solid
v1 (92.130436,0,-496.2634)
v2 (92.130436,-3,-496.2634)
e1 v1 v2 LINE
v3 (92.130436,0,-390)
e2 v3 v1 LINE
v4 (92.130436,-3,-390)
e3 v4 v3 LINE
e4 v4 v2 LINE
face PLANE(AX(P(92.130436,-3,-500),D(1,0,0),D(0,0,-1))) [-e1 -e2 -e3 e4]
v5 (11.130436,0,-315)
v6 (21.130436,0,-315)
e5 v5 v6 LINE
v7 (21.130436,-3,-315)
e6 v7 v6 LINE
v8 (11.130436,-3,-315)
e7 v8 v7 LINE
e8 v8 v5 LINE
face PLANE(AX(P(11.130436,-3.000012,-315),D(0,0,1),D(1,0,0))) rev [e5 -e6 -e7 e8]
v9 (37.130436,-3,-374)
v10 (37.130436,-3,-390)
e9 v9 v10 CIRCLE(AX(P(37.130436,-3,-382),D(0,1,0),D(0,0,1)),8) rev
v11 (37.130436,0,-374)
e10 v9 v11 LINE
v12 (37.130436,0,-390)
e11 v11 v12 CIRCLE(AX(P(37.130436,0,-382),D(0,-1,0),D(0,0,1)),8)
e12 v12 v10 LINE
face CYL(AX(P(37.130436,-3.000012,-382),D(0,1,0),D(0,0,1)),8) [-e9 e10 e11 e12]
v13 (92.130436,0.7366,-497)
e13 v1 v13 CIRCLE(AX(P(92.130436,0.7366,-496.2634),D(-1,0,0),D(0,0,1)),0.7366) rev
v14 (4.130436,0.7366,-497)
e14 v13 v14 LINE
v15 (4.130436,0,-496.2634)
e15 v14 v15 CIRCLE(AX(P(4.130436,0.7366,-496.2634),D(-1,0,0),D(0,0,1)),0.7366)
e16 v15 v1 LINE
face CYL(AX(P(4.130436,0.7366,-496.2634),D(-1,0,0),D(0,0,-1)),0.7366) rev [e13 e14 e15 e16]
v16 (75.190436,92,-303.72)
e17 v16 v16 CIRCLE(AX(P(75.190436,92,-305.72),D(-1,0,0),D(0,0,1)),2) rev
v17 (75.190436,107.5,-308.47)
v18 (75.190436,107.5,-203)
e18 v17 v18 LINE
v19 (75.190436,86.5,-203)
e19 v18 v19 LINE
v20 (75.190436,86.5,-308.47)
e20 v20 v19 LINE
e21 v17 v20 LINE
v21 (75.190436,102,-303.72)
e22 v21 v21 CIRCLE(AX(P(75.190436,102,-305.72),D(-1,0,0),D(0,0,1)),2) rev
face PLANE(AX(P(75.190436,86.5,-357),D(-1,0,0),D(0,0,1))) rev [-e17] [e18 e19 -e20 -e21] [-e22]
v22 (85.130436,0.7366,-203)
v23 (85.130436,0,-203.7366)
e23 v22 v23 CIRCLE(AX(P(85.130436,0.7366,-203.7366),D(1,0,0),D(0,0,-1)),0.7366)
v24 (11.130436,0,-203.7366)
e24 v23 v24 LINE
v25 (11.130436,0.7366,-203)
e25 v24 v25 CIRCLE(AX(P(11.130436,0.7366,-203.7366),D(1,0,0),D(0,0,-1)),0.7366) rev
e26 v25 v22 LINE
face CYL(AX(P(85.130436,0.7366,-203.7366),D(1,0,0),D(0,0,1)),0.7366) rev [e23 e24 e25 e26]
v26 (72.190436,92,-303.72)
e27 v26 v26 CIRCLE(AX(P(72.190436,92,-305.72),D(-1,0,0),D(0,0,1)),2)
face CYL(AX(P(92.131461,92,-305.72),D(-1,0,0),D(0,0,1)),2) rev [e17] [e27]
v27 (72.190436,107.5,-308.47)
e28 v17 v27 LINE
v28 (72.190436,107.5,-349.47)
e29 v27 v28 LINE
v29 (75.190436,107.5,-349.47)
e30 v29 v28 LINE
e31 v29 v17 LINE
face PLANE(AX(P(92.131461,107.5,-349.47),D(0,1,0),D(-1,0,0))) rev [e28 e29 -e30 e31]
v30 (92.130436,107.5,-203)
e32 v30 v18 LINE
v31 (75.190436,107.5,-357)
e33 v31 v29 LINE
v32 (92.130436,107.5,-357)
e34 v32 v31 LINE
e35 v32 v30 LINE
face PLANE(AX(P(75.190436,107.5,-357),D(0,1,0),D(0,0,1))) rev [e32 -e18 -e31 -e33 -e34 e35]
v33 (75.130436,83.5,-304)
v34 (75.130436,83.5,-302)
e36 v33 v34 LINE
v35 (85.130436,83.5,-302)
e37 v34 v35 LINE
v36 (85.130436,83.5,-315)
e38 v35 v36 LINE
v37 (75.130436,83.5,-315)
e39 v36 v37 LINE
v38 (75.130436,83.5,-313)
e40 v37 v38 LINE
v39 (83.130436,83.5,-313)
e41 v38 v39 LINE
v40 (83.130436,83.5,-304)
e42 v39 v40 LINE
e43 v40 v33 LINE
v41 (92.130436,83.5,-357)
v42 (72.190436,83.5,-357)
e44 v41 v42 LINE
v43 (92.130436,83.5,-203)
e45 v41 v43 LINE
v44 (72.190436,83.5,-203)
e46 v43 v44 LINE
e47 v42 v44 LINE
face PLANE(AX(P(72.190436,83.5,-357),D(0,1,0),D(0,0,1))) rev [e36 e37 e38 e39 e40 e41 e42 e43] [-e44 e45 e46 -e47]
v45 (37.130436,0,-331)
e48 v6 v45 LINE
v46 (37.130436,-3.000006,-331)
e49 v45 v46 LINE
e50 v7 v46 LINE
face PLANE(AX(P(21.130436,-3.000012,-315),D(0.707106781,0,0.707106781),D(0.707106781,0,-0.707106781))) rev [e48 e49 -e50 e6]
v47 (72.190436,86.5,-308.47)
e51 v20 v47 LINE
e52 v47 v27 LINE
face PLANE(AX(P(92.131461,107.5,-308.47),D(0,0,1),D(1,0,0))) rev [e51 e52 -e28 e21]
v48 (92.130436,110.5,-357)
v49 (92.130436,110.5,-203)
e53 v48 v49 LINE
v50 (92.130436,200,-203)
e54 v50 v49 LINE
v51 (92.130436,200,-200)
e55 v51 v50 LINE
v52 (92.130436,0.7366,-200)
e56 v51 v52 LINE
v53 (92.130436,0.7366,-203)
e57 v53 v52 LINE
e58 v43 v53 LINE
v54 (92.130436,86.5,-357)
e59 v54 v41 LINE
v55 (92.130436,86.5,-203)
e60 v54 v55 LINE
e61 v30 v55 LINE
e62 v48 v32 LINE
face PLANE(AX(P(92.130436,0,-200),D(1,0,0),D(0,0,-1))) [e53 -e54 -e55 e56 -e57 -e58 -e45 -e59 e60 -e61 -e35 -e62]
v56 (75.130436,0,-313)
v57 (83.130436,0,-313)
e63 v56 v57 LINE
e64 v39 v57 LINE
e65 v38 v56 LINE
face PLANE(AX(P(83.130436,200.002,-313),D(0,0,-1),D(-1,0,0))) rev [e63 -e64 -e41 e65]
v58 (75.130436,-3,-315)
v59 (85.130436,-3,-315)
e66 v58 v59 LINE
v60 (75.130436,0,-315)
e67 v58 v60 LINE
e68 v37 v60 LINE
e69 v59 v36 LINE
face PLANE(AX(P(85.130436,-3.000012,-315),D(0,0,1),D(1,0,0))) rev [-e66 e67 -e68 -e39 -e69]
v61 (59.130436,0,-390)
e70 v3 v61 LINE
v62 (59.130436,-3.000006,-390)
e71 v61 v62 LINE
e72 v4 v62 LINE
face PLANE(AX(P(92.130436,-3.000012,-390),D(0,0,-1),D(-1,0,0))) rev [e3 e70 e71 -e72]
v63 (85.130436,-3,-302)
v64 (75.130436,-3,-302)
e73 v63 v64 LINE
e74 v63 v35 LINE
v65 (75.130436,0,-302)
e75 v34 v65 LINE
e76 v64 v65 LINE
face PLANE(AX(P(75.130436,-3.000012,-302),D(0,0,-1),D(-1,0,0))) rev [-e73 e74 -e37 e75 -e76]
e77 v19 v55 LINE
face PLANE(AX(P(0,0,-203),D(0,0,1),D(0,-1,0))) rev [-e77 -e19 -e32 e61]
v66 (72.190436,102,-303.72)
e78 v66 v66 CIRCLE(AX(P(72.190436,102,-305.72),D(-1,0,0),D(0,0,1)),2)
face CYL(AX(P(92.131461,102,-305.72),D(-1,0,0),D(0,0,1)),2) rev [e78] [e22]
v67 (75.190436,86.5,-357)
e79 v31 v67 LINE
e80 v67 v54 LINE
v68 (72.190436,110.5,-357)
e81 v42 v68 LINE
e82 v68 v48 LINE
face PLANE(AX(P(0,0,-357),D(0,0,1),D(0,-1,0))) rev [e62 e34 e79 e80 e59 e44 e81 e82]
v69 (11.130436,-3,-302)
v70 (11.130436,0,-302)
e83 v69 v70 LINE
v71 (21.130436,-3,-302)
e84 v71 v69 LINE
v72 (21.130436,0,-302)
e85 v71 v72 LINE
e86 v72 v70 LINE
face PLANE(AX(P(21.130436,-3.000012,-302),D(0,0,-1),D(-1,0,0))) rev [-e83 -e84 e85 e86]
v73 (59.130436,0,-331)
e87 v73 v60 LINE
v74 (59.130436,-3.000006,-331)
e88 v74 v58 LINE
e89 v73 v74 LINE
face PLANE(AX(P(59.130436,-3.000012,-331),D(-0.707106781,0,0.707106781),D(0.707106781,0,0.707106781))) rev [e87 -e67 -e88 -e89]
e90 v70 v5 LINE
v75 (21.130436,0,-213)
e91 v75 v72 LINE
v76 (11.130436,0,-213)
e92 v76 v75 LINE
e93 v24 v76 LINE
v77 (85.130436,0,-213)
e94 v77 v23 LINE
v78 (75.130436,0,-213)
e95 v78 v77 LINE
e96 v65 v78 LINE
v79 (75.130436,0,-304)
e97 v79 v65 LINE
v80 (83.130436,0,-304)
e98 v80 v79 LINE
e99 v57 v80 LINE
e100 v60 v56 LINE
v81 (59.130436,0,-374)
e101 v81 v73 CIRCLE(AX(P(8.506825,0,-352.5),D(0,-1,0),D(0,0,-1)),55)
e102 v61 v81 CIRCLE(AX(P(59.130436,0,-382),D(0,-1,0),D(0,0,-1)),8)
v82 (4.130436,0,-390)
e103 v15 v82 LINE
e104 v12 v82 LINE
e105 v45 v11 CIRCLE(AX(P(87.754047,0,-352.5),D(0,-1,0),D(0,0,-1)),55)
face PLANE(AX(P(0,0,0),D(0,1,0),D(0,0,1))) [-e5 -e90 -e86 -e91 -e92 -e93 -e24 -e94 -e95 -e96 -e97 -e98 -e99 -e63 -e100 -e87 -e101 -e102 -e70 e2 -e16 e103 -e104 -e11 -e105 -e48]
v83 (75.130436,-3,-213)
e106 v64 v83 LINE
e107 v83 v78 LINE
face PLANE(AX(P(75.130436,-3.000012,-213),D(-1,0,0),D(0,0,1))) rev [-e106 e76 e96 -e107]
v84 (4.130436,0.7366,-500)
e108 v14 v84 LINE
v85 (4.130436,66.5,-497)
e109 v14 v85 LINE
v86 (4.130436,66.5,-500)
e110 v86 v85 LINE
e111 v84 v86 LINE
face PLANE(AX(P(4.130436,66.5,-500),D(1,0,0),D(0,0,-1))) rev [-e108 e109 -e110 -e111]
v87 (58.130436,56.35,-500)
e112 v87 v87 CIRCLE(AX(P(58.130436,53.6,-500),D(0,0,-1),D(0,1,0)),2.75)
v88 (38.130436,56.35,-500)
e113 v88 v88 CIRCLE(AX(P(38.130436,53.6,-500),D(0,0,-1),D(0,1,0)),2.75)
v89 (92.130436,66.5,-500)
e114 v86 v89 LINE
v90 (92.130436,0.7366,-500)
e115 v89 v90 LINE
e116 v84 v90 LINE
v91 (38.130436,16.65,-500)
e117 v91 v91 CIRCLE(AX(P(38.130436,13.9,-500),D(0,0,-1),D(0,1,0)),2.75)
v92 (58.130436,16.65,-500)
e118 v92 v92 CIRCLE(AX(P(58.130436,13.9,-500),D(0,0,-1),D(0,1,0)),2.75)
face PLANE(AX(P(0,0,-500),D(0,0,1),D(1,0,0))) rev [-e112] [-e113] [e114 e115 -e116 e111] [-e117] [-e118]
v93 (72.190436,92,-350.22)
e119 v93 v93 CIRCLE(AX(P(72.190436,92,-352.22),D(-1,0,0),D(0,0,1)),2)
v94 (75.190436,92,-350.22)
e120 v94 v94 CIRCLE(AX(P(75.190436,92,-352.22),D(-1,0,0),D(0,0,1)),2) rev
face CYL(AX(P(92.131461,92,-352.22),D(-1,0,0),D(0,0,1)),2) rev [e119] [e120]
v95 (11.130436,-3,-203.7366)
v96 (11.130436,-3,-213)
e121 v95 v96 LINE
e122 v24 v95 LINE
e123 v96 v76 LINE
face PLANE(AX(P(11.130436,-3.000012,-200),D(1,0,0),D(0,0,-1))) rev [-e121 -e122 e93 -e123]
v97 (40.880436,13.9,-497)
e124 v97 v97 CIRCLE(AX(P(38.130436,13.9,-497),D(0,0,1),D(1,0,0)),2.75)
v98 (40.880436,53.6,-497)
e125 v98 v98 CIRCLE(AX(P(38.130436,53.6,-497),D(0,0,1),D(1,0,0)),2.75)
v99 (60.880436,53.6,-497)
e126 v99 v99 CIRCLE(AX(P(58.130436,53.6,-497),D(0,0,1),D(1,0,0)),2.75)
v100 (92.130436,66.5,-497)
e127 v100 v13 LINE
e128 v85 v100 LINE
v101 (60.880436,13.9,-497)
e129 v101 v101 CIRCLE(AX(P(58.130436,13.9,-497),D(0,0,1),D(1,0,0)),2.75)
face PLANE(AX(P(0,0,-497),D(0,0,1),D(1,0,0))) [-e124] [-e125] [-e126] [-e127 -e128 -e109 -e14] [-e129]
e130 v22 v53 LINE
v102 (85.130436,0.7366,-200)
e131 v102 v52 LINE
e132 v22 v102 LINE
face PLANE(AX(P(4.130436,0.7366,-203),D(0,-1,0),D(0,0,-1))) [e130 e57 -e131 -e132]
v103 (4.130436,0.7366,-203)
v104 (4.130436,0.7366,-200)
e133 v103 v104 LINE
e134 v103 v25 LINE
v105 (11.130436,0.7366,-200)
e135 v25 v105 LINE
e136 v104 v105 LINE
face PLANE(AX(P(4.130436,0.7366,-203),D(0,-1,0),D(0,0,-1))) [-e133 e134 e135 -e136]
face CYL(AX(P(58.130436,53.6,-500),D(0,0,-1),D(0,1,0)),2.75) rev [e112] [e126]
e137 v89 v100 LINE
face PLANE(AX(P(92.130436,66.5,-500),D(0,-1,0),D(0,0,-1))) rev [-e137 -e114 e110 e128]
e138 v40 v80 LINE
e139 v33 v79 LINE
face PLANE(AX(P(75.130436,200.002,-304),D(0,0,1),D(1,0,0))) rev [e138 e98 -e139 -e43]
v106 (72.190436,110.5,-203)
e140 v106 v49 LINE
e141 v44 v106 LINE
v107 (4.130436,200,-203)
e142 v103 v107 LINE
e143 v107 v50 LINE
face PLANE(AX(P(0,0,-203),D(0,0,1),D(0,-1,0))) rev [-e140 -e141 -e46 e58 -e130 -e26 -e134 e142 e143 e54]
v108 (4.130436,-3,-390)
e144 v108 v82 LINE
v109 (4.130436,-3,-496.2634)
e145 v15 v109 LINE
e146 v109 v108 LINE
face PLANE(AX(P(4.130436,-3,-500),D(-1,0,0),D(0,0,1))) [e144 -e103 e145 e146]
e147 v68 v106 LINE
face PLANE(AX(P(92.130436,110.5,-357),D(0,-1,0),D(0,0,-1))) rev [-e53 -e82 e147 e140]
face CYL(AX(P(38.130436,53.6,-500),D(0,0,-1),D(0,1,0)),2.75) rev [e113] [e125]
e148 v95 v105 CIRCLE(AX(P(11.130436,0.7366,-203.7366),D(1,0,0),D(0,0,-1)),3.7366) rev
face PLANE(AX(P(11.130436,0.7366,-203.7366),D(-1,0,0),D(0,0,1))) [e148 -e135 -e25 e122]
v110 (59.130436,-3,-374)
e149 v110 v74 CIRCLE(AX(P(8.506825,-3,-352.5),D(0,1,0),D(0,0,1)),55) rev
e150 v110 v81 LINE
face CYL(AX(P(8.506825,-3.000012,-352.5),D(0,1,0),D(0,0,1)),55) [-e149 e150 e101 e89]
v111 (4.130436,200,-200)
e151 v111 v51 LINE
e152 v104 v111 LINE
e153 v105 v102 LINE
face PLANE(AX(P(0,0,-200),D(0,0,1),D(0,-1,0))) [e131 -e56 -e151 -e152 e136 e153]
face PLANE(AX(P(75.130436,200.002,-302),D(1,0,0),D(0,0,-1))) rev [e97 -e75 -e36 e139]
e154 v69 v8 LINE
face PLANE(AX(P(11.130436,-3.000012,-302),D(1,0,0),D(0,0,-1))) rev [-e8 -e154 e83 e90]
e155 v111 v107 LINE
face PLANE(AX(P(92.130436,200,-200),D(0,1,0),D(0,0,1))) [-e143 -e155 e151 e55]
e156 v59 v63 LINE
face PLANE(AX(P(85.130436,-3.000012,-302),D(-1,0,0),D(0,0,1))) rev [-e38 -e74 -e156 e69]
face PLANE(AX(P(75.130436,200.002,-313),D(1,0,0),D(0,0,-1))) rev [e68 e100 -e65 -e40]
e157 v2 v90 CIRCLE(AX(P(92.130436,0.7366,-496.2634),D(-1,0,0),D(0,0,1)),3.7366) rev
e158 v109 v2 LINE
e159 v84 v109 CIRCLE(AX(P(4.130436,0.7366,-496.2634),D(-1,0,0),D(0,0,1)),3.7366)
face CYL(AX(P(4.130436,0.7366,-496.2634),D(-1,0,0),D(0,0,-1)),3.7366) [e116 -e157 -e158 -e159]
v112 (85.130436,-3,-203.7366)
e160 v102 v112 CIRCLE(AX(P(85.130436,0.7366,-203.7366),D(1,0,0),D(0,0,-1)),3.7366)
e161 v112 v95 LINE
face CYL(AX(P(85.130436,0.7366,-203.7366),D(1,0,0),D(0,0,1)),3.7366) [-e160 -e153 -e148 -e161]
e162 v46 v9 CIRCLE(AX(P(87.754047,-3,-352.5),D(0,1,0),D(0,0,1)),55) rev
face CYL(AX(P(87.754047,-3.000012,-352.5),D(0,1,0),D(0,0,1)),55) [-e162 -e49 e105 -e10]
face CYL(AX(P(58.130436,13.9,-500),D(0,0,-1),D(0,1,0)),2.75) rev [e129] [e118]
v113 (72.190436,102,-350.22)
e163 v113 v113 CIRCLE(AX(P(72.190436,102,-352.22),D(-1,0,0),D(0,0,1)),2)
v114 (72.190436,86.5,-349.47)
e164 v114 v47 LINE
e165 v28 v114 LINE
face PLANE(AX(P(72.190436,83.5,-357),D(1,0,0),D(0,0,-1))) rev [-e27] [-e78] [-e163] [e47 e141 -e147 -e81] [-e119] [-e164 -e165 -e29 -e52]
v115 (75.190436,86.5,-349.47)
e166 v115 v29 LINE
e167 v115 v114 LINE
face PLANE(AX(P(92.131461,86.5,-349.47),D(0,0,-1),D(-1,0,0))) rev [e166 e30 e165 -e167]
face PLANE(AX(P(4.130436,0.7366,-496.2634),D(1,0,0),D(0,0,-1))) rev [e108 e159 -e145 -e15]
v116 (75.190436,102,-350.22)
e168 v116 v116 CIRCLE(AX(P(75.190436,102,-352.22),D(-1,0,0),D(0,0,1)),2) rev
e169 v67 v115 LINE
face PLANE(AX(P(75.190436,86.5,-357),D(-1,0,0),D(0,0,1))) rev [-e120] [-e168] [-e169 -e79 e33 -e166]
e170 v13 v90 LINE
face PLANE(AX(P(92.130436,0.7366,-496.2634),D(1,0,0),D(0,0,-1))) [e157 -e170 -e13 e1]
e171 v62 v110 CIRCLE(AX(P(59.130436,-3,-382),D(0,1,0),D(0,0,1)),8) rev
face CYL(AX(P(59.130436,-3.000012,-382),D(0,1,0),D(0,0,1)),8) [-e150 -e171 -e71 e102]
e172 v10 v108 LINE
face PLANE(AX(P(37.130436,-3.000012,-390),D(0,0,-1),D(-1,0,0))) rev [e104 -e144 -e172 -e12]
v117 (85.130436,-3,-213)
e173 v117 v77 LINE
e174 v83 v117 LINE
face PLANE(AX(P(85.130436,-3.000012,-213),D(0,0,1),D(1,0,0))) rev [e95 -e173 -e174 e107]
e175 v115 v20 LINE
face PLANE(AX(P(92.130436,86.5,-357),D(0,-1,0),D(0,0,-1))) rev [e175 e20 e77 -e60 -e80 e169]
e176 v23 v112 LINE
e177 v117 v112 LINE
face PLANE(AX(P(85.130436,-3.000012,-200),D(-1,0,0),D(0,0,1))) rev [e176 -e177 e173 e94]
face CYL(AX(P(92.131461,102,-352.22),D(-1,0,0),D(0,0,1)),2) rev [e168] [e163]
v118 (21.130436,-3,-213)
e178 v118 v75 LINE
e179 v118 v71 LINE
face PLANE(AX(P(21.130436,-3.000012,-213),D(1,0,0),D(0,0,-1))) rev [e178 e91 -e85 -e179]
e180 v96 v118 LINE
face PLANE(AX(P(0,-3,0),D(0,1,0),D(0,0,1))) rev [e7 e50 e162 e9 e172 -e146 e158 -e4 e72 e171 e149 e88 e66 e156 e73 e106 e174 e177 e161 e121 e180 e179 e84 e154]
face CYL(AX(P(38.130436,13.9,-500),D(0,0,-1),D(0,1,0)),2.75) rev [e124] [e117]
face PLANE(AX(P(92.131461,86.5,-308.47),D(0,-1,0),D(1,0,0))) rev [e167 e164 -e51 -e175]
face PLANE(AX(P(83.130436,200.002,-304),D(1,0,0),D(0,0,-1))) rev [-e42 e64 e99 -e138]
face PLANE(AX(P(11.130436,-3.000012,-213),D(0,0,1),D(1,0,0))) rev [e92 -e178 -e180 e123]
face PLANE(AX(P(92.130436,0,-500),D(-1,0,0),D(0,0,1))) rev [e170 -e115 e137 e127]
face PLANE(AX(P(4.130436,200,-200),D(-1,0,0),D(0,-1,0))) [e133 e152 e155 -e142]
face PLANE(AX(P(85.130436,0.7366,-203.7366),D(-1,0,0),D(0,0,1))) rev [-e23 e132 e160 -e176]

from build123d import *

# Parameters (mm, degrees)
BASE_FLANGE1_START                    = -3
BASE_FLANGE1_OUTLINE_W                = 88
BASE_FLANGE1_OUTLINE_H                = 300
BASE_FLANGE1_DEPTH                    = 3
CUT_EXTRUDE2_DEPTH                    = 509.426019398
CUT_EXTRUDE2_DEPTH_BACK               = 3
SKETCH14_OUTSIDE_W                    = 152.53
SKETCH14_OUTSIDE_H                    = 364.53
T_LE_PLI_E_SUR_AR_TE2_STRIP_W         = 13.4732
T_LE_PLI_E_SUR_AR_TE2_STRIP_H         = 3
T_LE_PLI_E_SUR_AR_TE2_STRIP_CUT_DEPTH = 88
T_LE_PLI_E_SUR_AR_TE2_DEPTH           = 88
D_GAGEMENT_M51_D                      = 5.5
T_LE_PLI_E_SUR_AR_TE3_STRIP_W         = 13.4732
T_LE_PLI_E_SUR_AR_TE3_STRIP_H         = 3
T_LE_PLI_E_SUR_AR_TE3_STRIP_CUT_DEPTH = 74
T_LE_PLI_E_SUR_AR_TE3_DEPTH           = 74
T_LE_PLI_E_SUR_AR_TE3_PROFILE_W       = 88
T_LE_PLI_E_SUR_AR_TE3_PROFILE_H       = 199.2634
T_LE_PLI_E_SUR_AR_TE3_FLAT_DEPTH      = 3
BOSS_EXTRUDE2_DEPTH                   = 154
CUT_EXTRUDE3_REACH                    = 544.8
SKETCH48_W                            = 41
SKETCH48_H                            = 21
BOSS_EXTRUDE3_REACH                   = 548.341
CUT_EXTRUDE4_REACH                    = 544.8
SKETCH50_R                            = 2


# Read off the part's stored shape, not the designer's step: Base-Flange1
# Sheet-metal steps are written as plain solids
with BuildPart() as part:
    # Base-Flange1 outline → Base-Flange1 (new body)
    with BuildSketch(Plane(origin=(0, 0, 0), x_dir=(1, 0, 0), z_dir=(0, 1, 0)).offset(BASE_FLANGE1_START)):
        with Locations((48.130435799, 350)):
            Rectangle(BASE_FLANGE1_OUTLINE_W, BASE_FLANGE1_OUTLINE_H)
    extrude(amount=BASE_FLANGE1_DEPTH)

    # Sketch14 outside → Cut-Extrude2 (cut, two sides: drawn at the far end of the back side and taken through both)
    with BuildSketch(Plane.XZ.offset(3).offset(-CUT_EXTRUDE2_DEPTH_BACK)):
        with Locations((48.13, -350)):
            Rectangle(SKETCH14_OUTSIDE_W, SKETCH14_OUTSIDE_H)
        with BuildLine():
            Line((85.130435799, -200), (11.130435799, -200))
            Line((11.130435799, -200), (11.130435799, -213))
            Line((11.130435799, -213), (21.130435799, -213))
            Line((21.130435799, -213), (21.130435799, -302))
            Line((21.130435799, -302), (11.130435799, -302))
            Line((11.130435799, -302), (11.130435799, -315))
            Line((11.130435799, -315), (21.130435799, -315))
            Line((21.130435799, -315), (37.130435799, -331))
            ThreePointArc((37.130435799, -331), (32.754046891, -352.5), (37.130435799, -374))
            ThreePointArc((37.130435799, -374), (29.130435799, -382), (37.130435799, -390))
            Line((37.130435799, -390), (4.130435799, -390))
            Line((4.130435799, -390), (4.130435799, -500))
            Line((4.130435799, -500), (92.130435799, -500))
            Line((92.130435799, -500), (92.130435799, -390))
            Line((92.130435799, -390), (59.130435799, -390))
            ThreePointArc((59.130435799, -390), (67.130435799, -382), (59.130435799, -374))
            ThreePointArc((59.130435799, -374), (63.506824707, -352.5), (59.130435799, -331))
            Line((59.130435799, -331), (75.130435799, -315))
            Line((75.130435799, -315), (85.130435799, -315))
            Line((85.130435799, -315), (85.130435799, -302))
            Line((85.130435799, -302), (75.130435799, -302))
            Line((75.130435799, -302), (75.130435799, -213))
            Line((75.130435799, -213), (85.130435799, -213))
            Line((85.130435799, -213), (85.130435799, -200))
        make_face(mode=Mode.SUBTRACT)
    extrude(amount=CUT_EXTRUDE2_DEPTH + CUT_EXTRUDE2_DEPTH_BACK, mode=Mode.SUBTRACT)

    # Tôle pliée sur arête2 strip (across the edge) → Tôle pliée sur arête2 strip cut (cut)
    with BuildSketch(Plane(origin=(92.130435799, 0, -500), x_dir=(0, 0, 1), z_dir=(-1, 0, 0))):
        with Locations((-3, -1.5)):
            Rectangle(T_LE_PLI_E_SUR_AR_TE2_STRIP_W, T_LE_PLI_E_SUR_AR_TE2_STRIP_H)
    extrude(amount=T_LE_PLI_E_SUR_AR_TE2_STRIP_CUT_DEPTH, mode=Mode.SUBTRACT)

    # Tôle pliée sur arête2 section (across the edge) → Tôle pliée sur arête2 (add)
    with BuildSketch(Plane(origin=(92.130435799, 0, -500), x_dir=(0, 0, 1), z_dir=(-1, 0, 0))):
        with BuildLine():
            Line((0, 0.7366), (0, 66.5))
            Line((0, 66.5), (3, 66.5))
            Line((3, 66.5), (3, 0.7366))
            ThreePointArc((3, 0.7366), (3.215745145, 0.215745145), (3.7366, 0))
            Line((3.7366, 0), (3.7366, -3))
            ThreePointArc((3.7366, -3), (1.094424801, -1.905575199), (0, 0.7366))
        make_face()
    extrude(amount=T_LE_PLI_E_SUR_AR_TE2_DEPTH)

    # Dégagement M51 (through all)
    with Locations(Plane(origin=(58.130435799, 53.6, -500), x_dir=(-1, 0, 0), z_dir=(0, 0, -1))):
        with Locations((0, 0), (20, 0), (0, -39.7), (20, -39.7)):
            Hole(D_GAGEMENT_M51_D / 2)

    # Tôle pliée sur arête3 strip (across the edge) → Tôle pliée sur arête3 strip cut (cut)
    with BuildSketch(Plane(origin=(11.130435799, 0, -200), x_dir=(0, 0, -1), z_dir=(1, 0, 0))):
        with Locations((-3, -1.5)):
            Rectangle(T_LE_PLI_E_SUR_AR_TE3_STRIP_W, T_LE_PLI_E_SUR_AR_TE3_STRIP_H)
    extrude(amount=T_LE_PLI_E_SUR_AR_TE3_STRIP_CUT_DEPTH, mode=Mode.SUBTRACT)

    # Tôle pliée sur arête3 bend section (across the edge) → Tôle pliée sur arête3 (add)
    with BuildSketch(Plane(origin=(11.130435799, 0, -200), x_dir=(0, 0, -1), z_dir=(1, 0, 0))):
        with BuildLine():
            Line((0, 0.7366), (3, 0.7366))
            ThreePointArc((3, 0.7366), (3.215745145, 0.215745145), (3.7366, 0))
            Line((3.7366, 0), (3.7366, -3))
            ThreePointArc((3.7366, -3), (1.094424801, -1.905575199), (0, 0.7366))
        make_face()
    extrude(amount=T_LE_PLI_E_SUR_AR_TE3_DEPTH)

    # Tôle pliée sur arête3 profile (on flange) → Tôle pliée sur arête3 flat (add)
    with BuildSketch(Plane(origin=(0, 0, -200), x_dir=(-1, 0, 0), z_dir=(0, 0, -1))):
        with Locations((-48.130435799, 100.3683)):
            Rectangle(T_LE_PLI_E_SUR_AR_TE3_PROFILE_W, T_LE_PLI_E_SUR_AR_TE3_PROFILE_H)
    extrude(amount=T_LE_PLI_E_SUR_AR_TE3_FLAT_DEPTH)

    # Sketch47 → Boss-Extrude2 (add)
    with BuildSketch(Plane(origin=(0, 0, -203), x_dir=(-1, 0, 0), z_dir=(0, 0, -1))):
        Polygon((-72.190435799, 83.5), (-72.190435799, 110.5), (-92.130435799, 110.5), (-92.130435799, 107.5), (-75.190435799, 107.5), (-75.190435799, 86.5), (-92.130435799, 86.5), (-92.130435799, 83.5), align=None)
    extrude(amount=BOSS_EXTRUDE2_DEPTH)

    # Sketch48 → Cut-Extrude3 (cut, up to next)
    with BuildSketch(Plane.ZY.offset(-72.190435799), mode=Mode.PRIVATE) as cut_extrude3_sk1:
        with Locations((-328.97, 97)):
            Rectangle(SKETCH48_W, SKETCH48_H)
    cut_extrude3_tool1 = extrude(cut_extrude3_sk1.sketch, amount=-CUT_EXTRUDE3_REACH, mode=Mode.PRIVATE) & part.part
    add(cut_extrude3_tool1.solids().sort_by_distance((72.190436, 97, -328.97))[0], mode=Mode.SUBTRACT)

    # Sketch49 → Boss-Extrude3 (add, up to next)
    with BuildSketch(Plane(origin=(0, 0, 0), x_dir=(1, 0, 0), z_dir=(0, 1, 0)), mode=Mode.PRIVATE) as boss_extrude3_sk1:
        Polygon((75.130435799, 315), (85.130435799, 315), (85.130435799, 302), (75.130435799, 302), (75.130435799, 304), (83.130435799, 304), (83.130435799, 313), (75.130435799, 313), align=None)
    boss_extrude3_tool1 = extrude(boss_extrude3_sk1.sketch, amount=BOSS_EXTRUDE3_REACH, mode=Mode.PRIVATE) - part.part
    add(boss_extrude3_tool1.solids().sort_by_distance((80.130436, 0, -314.835988))[0])

    # Sketch50 → Cut-Extrude4 (cut, up to next)
    with BuildSketch(Plane.ZY.offset(-72.190435799), mode=Mode.PRIVATE) as cut_extrude4_sk1:
        with Locations((-352.22, 102)):
            Circle(SKETCH50_R)
    cut_extrude4_tool1 = extrude(cut_extrude4_sk1.sketch, amount=-CUT_EXTRUDE4_REACH, mode=Mode.PRIVATE) & part.part
    # Sketch50 → Cut-Extrude4 (cut, up to next)
    with BuildSketch(Plane.ZY.offset(-72.190435799), mode=Mode.PRIVATE) as cut_extrude4_sk2:
        with Locations((-352.22, 92)):
            Circle(SKETCH50_R)
    cut_extrude4_tool2 = extrude(cut_extrude4_sk2.sketch, amount=-CUT_EXTRUDE4_REACH, mode=Mode.PRIVATE) & part.part
    # Sketch50 → Cut-Extrude4 (cut, up to next)
    with BuildSketch(Plane.ZY.offset(-72.190435799), mode=Mode.PRIVATE) as cut_extrude4_sk3:
        with Locations((-305.72, 102)):
            Circle(SKETCH50_R)
    cut_extrude4_tool3 = extrude(cut_extrude4_sk3.sketch, amount=-CUT_EXTRUDE4_REACH, mode=Mode.PRIVATE) & part.part
    # Sketch50 → Cut-Extrude4 (cut, up to next)
    with BuildSketch(Plane.ZY.offset(-72.190435799), mode=Mode.PRIVATE) as cut_extrude4_sk4:
        with Locations((-305.72, 92)):
            Circle(SKETCH50_R)
    cut_extrude4_tool4 = extrude(cut_extrude4_sk4.sketch, amount=-CUT_EXTRUDE4_REACH, mode=Mode.PRIVATE) & part.part
    add(cut_extrude4_tool1.solids().sort_by_distance((72.190436, 102, -352.22))[0], mode=Mode.SUBTRACT)
    add(cut_extrude4_tool2.solids().sort_by_distance((72.190436, 92, -352.22))[0], mode=Mode.SUBTRACT)
    add(cut_extrude4_tool3.solids().sort_by_distance((72.190436, 102, -305.72))[0], mode=Mode.SUBTRACT)
    add(cut_extrude4_tool4.solids().sort_by_distance((72.190436, 92, -305.72))[0], mode=Mode.SUBTRACT)


solid = part.part
